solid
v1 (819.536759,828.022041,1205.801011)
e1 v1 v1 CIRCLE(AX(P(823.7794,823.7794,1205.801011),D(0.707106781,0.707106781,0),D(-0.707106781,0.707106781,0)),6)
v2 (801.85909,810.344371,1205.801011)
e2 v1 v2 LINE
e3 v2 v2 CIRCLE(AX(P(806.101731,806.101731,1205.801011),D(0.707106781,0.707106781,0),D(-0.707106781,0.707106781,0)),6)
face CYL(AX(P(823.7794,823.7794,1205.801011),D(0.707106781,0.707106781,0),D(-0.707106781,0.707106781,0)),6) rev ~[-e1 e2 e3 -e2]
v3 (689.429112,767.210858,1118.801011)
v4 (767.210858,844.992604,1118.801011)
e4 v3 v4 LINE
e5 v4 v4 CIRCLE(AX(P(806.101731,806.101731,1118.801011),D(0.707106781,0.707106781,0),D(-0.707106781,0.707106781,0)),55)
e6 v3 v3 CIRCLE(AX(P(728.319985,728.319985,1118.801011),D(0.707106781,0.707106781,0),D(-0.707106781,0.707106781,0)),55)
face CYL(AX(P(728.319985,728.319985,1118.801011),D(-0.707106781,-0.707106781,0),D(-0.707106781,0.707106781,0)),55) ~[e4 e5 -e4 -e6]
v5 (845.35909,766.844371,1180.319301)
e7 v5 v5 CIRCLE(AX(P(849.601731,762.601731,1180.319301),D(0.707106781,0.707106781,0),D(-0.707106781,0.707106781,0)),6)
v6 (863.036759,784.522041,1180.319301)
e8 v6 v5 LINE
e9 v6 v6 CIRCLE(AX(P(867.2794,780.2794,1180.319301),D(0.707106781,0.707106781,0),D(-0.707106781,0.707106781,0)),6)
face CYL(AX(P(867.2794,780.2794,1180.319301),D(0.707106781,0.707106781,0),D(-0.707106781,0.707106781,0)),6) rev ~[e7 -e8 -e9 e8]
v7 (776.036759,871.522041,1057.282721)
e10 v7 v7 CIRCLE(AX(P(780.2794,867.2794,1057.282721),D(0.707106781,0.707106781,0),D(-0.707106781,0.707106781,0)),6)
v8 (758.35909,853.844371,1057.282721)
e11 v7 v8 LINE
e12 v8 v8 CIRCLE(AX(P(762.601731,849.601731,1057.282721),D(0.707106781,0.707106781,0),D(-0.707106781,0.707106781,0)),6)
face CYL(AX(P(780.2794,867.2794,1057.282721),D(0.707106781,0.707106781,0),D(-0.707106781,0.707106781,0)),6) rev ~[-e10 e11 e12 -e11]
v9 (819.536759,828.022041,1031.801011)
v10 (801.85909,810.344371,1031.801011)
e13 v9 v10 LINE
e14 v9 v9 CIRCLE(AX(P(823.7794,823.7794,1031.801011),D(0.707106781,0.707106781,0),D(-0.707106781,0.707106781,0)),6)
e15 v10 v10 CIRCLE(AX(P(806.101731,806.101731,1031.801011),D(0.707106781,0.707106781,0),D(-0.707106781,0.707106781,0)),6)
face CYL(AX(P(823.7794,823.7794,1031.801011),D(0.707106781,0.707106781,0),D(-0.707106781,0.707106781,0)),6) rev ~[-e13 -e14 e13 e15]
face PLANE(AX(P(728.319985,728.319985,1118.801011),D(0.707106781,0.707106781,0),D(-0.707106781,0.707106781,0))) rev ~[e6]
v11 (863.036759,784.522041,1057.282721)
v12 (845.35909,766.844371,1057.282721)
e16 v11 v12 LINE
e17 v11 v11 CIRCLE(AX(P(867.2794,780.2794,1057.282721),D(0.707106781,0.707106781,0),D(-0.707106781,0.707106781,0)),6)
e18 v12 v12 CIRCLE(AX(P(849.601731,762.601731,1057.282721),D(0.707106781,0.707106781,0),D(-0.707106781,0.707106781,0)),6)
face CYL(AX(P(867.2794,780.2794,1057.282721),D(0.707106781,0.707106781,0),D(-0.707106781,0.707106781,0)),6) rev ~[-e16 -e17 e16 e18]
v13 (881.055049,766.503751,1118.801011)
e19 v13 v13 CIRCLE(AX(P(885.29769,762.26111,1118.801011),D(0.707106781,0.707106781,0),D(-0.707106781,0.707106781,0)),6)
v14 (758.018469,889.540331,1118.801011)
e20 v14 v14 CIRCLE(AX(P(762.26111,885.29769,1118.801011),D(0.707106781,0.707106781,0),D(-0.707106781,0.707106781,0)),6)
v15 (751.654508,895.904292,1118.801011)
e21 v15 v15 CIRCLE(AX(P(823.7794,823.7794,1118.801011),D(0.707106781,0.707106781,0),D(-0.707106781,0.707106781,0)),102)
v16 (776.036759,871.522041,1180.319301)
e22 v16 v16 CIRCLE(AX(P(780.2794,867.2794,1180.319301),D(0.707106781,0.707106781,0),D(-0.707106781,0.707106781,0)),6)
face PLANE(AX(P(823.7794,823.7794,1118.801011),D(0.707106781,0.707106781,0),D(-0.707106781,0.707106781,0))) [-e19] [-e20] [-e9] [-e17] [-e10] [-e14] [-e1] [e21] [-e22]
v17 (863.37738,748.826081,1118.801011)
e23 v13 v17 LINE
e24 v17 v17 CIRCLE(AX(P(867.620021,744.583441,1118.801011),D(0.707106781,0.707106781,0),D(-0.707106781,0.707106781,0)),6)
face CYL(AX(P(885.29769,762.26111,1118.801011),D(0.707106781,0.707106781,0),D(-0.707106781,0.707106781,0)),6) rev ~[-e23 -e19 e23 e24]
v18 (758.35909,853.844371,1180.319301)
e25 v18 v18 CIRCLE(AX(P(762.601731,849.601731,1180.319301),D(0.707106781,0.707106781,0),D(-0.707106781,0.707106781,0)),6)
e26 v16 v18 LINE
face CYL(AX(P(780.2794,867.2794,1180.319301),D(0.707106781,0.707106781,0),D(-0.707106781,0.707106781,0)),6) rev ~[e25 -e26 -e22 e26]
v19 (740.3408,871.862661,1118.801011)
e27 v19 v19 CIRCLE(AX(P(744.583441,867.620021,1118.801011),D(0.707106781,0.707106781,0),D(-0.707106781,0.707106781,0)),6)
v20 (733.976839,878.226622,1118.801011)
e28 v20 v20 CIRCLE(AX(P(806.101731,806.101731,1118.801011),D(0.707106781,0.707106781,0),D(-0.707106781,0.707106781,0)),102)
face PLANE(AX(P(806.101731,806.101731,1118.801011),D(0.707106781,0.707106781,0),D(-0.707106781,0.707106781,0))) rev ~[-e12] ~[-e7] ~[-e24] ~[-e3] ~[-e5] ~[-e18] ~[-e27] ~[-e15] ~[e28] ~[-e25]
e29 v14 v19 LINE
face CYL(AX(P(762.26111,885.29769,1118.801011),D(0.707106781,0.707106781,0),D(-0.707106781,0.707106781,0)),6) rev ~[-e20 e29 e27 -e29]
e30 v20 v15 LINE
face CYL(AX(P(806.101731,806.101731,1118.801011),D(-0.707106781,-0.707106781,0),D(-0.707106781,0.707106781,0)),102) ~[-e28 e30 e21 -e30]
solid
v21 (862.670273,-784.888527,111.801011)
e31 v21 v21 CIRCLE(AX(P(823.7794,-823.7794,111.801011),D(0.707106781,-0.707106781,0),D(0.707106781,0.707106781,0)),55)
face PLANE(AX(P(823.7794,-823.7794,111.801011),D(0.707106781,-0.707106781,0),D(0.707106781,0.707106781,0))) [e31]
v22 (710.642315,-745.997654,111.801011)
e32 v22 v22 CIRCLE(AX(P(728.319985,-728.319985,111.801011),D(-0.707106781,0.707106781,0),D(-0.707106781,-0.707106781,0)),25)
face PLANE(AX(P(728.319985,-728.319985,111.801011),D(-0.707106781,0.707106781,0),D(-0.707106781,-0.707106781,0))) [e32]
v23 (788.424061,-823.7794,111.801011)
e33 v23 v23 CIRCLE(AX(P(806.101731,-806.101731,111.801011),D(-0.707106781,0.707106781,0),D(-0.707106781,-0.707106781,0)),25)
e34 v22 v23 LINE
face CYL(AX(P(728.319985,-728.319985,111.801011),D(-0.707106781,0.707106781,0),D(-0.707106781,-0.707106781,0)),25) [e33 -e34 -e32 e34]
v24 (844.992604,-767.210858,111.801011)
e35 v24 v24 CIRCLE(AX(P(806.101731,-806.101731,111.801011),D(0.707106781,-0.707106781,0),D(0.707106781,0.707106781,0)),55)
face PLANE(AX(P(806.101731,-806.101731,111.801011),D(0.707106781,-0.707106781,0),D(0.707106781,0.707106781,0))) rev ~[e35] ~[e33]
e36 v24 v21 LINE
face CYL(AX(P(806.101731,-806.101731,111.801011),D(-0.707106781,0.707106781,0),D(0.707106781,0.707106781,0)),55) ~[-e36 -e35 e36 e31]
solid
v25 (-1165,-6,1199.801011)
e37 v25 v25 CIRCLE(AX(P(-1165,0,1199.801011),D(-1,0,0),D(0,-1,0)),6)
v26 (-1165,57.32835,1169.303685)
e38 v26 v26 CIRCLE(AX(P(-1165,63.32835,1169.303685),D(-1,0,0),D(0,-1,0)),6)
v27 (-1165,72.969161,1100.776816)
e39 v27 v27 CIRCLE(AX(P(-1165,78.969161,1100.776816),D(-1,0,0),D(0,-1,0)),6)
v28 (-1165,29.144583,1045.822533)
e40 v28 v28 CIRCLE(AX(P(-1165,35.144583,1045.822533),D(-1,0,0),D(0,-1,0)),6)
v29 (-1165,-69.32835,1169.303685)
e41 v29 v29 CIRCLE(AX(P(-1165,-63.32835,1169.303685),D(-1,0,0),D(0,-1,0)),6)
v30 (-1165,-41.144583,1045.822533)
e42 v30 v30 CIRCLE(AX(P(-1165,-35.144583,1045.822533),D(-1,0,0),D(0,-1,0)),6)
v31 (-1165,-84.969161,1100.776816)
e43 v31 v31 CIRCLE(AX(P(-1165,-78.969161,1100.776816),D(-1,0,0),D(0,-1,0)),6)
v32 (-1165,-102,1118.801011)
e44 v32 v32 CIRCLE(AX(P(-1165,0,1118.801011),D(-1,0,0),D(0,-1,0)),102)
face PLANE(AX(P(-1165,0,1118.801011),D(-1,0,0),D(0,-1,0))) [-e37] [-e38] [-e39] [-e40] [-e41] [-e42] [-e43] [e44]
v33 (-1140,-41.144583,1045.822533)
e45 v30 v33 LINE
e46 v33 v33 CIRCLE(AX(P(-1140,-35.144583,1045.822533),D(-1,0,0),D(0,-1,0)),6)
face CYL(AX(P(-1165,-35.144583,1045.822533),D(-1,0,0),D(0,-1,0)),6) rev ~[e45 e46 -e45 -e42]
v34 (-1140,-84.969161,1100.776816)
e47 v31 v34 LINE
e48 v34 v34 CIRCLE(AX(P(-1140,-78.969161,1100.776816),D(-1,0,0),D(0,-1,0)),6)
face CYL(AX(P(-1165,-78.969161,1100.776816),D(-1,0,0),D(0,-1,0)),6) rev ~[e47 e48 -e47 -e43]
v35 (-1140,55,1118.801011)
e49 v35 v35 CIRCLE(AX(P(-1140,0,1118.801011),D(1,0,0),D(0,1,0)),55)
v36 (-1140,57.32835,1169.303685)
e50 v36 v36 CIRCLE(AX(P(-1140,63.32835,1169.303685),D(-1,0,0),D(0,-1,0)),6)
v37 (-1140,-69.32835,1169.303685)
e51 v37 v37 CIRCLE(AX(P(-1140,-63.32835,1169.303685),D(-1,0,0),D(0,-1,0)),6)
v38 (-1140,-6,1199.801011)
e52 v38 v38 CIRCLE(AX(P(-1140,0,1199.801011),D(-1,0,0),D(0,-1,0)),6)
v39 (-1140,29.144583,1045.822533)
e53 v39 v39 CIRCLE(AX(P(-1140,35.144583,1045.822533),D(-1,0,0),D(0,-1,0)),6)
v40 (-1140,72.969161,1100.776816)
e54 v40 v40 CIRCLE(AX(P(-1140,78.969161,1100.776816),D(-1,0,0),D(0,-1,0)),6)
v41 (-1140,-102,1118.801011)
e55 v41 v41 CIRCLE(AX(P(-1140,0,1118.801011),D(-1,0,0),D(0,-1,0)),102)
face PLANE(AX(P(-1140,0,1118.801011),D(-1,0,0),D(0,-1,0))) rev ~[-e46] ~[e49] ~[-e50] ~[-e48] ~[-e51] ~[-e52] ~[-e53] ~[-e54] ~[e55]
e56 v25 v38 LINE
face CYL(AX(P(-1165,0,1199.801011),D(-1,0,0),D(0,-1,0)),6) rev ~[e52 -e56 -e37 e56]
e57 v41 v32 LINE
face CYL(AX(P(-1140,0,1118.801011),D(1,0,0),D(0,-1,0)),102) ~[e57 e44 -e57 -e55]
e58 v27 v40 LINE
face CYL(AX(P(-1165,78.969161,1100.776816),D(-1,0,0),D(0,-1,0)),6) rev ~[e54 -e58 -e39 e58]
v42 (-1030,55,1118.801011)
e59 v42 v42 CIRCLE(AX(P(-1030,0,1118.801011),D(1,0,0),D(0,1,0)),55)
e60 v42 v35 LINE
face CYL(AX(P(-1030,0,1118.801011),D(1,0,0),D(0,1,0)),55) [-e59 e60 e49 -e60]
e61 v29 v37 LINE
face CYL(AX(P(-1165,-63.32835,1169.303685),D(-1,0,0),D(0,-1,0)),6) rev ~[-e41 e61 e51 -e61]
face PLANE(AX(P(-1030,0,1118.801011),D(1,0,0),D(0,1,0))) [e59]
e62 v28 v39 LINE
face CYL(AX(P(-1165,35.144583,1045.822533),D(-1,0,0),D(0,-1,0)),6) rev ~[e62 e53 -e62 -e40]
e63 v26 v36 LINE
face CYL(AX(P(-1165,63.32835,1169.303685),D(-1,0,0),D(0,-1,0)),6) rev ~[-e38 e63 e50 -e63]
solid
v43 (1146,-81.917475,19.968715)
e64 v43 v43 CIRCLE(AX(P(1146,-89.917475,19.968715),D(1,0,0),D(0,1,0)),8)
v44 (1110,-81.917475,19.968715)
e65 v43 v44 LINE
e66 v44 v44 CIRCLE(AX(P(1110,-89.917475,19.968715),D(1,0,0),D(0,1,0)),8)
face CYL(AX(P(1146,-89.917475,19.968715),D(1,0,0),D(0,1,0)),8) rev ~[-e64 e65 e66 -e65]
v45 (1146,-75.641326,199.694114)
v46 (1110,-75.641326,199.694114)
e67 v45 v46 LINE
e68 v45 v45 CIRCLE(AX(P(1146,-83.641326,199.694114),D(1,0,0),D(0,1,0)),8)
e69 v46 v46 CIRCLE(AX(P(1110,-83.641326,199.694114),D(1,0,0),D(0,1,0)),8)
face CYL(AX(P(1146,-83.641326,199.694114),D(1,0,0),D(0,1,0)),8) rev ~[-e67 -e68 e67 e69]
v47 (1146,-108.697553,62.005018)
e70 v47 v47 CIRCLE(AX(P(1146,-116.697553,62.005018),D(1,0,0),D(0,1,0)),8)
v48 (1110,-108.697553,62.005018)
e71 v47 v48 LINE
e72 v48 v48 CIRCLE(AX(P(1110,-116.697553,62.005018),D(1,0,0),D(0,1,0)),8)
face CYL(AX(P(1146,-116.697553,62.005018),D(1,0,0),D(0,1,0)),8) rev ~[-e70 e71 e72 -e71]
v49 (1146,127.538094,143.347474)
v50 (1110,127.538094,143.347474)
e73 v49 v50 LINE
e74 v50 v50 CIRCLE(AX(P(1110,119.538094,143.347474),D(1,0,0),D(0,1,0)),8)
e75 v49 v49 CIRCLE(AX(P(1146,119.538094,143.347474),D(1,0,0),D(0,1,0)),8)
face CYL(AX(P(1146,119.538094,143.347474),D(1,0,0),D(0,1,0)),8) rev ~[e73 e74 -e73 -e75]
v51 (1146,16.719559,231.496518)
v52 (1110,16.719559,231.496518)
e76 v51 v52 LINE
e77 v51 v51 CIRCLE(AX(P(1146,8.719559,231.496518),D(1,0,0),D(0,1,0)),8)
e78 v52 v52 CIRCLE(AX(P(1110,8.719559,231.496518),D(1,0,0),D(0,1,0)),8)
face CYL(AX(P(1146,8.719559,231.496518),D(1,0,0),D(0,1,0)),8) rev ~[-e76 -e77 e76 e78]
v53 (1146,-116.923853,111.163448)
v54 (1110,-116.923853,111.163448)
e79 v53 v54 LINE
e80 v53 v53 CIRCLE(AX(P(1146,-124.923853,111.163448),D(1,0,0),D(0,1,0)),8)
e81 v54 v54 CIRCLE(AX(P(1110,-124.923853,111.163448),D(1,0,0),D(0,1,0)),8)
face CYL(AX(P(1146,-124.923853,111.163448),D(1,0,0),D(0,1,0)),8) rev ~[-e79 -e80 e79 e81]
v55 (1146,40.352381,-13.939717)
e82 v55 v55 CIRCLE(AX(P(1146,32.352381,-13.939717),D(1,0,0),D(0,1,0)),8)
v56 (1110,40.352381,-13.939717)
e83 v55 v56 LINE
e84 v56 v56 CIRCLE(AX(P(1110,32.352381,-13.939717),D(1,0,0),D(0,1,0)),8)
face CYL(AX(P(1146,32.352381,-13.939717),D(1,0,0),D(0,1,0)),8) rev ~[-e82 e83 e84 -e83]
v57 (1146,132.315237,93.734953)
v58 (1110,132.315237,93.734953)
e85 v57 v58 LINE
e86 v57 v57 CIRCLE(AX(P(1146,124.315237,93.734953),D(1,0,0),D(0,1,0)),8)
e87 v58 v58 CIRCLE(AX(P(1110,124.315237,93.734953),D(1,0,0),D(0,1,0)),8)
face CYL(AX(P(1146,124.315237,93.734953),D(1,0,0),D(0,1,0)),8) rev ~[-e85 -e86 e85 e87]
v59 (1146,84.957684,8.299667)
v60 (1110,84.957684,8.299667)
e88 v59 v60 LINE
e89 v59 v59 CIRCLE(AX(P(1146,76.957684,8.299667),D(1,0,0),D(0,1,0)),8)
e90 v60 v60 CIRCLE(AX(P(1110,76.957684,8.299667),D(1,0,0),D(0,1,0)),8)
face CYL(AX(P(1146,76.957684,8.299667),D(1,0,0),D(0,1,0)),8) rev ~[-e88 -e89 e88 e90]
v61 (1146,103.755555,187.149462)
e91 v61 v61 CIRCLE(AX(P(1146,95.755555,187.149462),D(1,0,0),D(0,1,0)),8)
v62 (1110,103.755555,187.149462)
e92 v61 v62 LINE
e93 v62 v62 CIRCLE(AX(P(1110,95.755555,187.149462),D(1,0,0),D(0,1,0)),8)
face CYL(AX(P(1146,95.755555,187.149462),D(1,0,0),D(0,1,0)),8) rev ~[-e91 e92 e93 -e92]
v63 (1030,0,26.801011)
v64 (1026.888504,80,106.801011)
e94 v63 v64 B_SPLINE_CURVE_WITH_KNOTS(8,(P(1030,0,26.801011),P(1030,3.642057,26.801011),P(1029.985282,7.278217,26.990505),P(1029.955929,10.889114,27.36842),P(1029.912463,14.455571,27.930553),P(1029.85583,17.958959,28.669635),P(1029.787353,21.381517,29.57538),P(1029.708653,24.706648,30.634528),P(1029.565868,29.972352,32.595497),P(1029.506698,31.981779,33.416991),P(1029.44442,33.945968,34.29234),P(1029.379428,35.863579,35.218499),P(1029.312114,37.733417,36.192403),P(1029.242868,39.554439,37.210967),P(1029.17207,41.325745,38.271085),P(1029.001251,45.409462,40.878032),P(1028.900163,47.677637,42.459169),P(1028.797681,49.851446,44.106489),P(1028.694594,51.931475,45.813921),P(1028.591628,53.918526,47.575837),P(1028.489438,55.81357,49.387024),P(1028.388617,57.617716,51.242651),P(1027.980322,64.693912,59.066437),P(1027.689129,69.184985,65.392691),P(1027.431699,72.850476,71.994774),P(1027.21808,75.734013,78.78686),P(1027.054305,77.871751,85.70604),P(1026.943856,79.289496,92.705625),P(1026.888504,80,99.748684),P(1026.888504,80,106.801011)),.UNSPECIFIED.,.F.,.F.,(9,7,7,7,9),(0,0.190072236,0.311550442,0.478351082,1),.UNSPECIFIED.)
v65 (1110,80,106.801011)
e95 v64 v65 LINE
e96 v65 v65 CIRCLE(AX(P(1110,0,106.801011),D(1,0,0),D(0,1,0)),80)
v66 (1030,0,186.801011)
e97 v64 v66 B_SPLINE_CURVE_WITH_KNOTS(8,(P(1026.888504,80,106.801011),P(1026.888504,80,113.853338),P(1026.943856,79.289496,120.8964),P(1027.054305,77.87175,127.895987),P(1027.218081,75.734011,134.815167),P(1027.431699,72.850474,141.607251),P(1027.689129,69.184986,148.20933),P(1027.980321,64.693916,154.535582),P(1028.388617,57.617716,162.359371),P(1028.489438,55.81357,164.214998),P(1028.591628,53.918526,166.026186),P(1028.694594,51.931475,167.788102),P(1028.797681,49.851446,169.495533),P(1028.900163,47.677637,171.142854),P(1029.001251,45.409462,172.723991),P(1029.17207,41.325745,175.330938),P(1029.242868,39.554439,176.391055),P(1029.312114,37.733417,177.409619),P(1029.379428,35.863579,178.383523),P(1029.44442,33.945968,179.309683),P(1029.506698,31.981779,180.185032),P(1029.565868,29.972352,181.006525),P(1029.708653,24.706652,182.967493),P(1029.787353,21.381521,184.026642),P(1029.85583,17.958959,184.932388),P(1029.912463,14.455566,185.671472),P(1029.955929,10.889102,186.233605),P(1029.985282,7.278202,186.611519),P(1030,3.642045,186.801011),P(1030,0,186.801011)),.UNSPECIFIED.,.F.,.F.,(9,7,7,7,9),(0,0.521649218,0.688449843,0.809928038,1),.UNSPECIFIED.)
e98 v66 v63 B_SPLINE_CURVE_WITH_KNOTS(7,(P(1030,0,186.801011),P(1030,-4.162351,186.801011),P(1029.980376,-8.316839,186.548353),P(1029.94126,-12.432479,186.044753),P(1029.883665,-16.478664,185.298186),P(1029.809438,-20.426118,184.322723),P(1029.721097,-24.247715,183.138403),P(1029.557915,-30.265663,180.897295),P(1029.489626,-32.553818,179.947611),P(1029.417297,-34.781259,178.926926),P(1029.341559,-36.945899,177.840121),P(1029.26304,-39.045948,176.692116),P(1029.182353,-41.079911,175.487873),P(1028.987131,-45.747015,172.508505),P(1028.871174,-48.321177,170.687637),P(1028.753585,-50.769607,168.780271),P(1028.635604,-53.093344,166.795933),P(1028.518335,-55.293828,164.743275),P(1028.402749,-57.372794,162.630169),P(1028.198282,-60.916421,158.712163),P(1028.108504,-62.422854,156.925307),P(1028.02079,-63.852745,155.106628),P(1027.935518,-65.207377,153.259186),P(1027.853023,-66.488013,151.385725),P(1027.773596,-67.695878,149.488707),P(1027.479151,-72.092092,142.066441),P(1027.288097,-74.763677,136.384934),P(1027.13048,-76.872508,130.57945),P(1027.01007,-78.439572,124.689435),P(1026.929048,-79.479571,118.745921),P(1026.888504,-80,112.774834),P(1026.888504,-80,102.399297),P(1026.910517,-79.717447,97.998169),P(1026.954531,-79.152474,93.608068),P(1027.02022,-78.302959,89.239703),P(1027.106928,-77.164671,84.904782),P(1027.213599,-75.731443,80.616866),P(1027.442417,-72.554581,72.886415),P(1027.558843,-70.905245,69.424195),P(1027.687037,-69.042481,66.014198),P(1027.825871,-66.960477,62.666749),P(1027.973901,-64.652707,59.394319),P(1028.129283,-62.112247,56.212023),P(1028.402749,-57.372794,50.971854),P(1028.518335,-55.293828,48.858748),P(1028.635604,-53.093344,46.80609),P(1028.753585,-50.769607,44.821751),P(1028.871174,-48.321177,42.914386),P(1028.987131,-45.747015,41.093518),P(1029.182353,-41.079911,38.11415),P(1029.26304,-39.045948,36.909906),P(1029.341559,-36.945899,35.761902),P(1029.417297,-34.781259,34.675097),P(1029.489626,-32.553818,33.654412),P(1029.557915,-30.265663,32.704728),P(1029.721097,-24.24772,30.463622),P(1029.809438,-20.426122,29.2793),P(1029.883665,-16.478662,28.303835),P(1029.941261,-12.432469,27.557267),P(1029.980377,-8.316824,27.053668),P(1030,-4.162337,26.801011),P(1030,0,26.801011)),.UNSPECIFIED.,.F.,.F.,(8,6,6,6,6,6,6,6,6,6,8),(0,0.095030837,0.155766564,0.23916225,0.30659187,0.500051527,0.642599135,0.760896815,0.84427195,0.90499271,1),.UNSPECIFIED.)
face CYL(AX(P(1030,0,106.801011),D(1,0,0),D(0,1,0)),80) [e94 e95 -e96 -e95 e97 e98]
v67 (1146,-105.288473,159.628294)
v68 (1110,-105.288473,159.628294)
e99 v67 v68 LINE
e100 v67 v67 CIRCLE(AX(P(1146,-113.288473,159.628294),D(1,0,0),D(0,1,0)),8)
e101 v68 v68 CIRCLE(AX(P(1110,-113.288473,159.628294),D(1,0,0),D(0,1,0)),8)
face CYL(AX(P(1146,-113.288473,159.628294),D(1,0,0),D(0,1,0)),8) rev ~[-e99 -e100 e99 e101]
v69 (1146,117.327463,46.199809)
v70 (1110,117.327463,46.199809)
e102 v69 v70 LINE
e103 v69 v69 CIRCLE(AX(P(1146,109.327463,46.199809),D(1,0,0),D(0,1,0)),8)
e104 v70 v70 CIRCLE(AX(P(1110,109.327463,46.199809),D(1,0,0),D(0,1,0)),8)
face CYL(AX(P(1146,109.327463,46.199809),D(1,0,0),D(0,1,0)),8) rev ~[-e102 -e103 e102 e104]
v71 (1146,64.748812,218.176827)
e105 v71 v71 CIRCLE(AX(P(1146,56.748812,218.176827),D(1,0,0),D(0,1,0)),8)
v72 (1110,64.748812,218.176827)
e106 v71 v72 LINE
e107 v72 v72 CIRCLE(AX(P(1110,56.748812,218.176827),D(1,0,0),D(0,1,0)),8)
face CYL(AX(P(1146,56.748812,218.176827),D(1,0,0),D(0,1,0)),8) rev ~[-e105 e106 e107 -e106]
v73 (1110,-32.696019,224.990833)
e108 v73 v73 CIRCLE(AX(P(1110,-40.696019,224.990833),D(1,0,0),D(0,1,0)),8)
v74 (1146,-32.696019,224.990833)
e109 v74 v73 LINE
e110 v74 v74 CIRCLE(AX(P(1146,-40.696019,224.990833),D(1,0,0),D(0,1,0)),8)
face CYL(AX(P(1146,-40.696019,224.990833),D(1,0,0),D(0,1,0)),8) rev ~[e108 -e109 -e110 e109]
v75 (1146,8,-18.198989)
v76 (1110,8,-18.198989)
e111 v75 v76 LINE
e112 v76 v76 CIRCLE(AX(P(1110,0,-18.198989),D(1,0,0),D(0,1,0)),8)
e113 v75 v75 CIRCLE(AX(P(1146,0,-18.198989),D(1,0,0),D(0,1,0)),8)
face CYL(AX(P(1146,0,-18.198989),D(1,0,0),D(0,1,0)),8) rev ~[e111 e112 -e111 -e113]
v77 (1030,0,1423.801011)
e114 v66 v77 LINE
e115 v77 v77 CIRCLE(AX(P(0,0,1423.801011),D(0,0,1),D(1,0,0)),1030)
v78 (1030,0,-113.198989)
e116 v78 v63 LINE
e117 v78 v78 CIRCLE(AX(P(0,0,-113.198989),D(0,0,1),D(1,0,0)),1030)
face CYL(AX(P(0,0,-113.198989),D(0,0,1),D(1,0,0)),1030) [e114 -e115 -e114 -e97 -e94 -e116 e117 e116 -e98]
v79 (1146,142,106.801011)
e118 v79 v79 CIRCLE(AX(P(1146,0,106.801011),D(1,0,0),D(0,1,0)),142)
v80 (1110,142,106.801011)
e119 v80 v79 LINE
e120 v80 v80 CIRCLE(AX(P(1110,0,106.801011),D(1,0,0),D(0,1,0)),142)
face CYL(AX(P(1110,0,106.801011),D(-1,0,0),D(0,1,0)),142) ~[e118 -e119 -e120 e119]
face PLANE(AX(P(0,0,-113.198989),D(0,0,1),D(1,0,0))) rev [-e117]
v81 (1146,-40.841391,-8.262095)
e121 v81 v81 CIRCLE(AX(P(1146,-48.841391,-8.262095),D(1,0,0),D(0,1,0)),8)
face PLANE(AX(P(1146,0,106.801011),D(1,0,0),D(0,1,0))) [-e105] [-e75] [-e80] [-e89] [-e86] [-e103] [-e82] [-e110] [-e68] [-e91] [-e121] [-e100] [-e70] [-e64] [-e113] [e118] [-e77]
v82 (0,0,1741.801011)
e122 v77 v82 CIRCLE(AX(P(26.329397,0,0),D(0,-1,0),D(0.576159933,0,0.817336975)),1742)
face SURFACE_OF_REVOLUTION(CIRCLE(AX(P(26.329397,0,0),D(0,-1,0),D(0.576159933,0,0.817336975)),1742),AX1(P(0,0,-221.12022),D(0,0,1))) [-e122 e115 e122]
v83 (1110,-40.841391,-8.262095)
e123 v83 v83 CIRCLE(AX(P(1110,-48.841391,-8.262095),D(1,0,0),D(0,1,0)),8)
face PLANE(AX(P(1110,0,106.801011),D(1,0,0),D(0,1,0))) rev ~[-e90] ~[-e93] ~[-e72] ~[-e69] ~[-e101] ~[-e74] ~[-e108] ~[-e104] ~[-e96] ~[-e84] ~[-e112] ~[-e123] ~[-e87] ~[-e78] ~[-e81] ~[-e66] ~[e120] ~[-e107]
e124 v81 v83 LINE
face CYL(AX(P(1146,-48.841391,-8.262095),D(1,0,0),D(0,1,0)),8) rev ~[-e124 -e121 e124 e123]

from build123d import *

# Parameters (mm, degrees)
F3_R      = 80
F4_DEPTH  = 80
F5_R      = 142
F6_DEPTH  = 36
F7_R      = 8
F8_DEPTH  = 75
F10_R     = 55
F11_DEPTH = 110
F12_R     = 102
F13_DEPTH = 25
F14_R     = 6
F15_DEPTH = 75
F18_R     = 55
F19_DEPTH = 110
F20_R     = 102
F21_DEPTH = 25
F22_R     = 6
F23_DEPTH = 75
F26_R     = 25
F27_DEPTH = 110
F28_R     = 55
F29_DEPTH = 25


with BuildPart() as f1:
    # F0 (on Front) → F1 (revolve)
    with BuildSketch(Plane.XZ):
        with BuildLine():
            Line((0, 1741.8010112751), (0, -113.1989887249))
            Line((0, -113.1989887249), (1030, -113.1989887249))
            Line((1030, -113.1989887249), (1030, 1423.8010112751))
            ThreePointArc((1030, 1423.8010112751), (540.2165034856, 1664.4771074705), (0, 1741.8010112751))
        make_face()
    revolve(axis=Axis((0, 0, -221.1202199703), (0, 0, 1)))

    # F3 (on offset) → F4 (join, symmetric)
    with BuildSketch(Plane.YZ.offset(1030)):
        with Locations((0, 106.8010112751)):
            Circle(F3_R)
    extrude(amount=F4_DEPTH, both=True)

    # F5 (on face) → F6 (join)
    with BuildSketch(Plane.YZ.offset(1110)):
        with Locations((0, 106.8010112751)):
            Circle(F5_R)
    extrude(amount=F6_DEPTH)

    # F7 (on face) → F8 (cut)
    with BuildSketch(Plane.YZ.offset(1146)):
        with Locations((0, -18.1989887249)):
            Circle(F7_R)
        with Locations((-48.8413910612, -8.2620954065)):
            Circle(F7_R)
        with Locations((-89.9174750423, 19.9687149677)):
            Circle(F7_R)
        with Locations((-116.6975533122, 62.0050175819)):
            Circle(F7_R)
        with Locations((-124.9238533774, 111.1634483629)):
            Circle(F7_R)
        with Locations((-113.2884733796, 159.6282939927)):
            Circle(F7_R)
        with Locations((-83.6413257949, 199.6941144598)):
            Circle(F7_R)
        with Locations((-40.6960193071, 224.990833225)):
            Circle(F7_R)
        with Locations((8.719559218, 231.4965175576)):
            Circle(F7_R)
        with Locations((56.7488124674, 218.1768267986)):
            Circle(F7_R)
        with Locations((95.7555553899, 187.1494624859)):
            Circle(F7_R)
        with Locations((119.5380944954, 143.3474743654)):
            Circle(F7_R)
        with Locations((124.315236921, 93.7349533666)):
            Circle(F7_R)
        with Locations((109.3274633924, 46.1998087443)):
            Circle(F7_R)
        with Locations((76.9576844157, 8.2996670743)):
            Circle(F7_R)
        with Locations((32.3523806378, -13.939717011)):
            Circle(F7_R)
    extrude(amount=-F8_DEPTH, mode=Mode.SUBTRACT)


with BuildPart() as f11:
    # F10 (on offset) → F11 (new body)
    with BuildSketch(Plane.YZ.offset(-1030)):
        with Locations((0, 1118.8010112751)):
            Circle(F10_R)
    extrude(amount=-F11_DEPTH)

    # F12 (on face) → F13 (join)
    with BuildSketch(Plane(origin=(-1140, 0, 0), x_dir=(0, -1, 0), z_dir=(-1, 0, 0))):
        with Locations((0, 1118.8010112751)):
            Circle(F12_R)
    extrude(amount=F13_DEPTH)

    # F14 (on face) → F15 (cut)
    with BuildSketch(Plane(origin=(-1165, 0, 0), x_dir=(0, -1, 0), z_dir=(-1, 0, 0))):
        with Locations((0, 1199.8010112751)):
            Circle(F14_R)
        with Locations((-1039.0581552505, -599.9005056375)):
            Circle(F14_R)
        with Locations((1039.0581552505, -599.9005056376)):
            Circle(F14_R)
        with Locations((63.3283500799, 1169.3036852257)):
            Circle(F14_R)
        with Locations((78.9691608867, 1100.7768156246)):
            Circle(F14_R)
        with Locations((35.1445828685, 1045.822532975)):
            Circle(F14_R)
        with Locations((-35.1445828685, 1045.822532975)):
            Circle(F14_R)
        with Locations((-78.9691608867, 1100.7768156246)):
            Circle(F14_R)
        with Locations((-63.3283500799, 1169.3036852257)):
            Circle(F14_R)
    extrude(amount=-F15_DEPTH, mode=Mode.SUBTRACT)


with BuildPart() as f19:
    # F18 (on face) → F19 (new body)
    with BuildSketch(Plane(origin=(728.3199846221, 728.3199846221, 0), x_dir=(-0.7071067812, 0.7071067812, 0), z_dir=(0.7071067812, 0.7071067812, 0))):
        with Locations((0, 1118.8010112751)):
            Circle(F18_R)
    extrude(amount=F19_DEPTH)

    # F20 (on face) → F21 (join)
    with BuildSketch(Plane(origin=(806.1017305527, 806.1017305527, 0), x_dir=(-0.7071067812, 0.7071067812, 0), z_dir=(0.7071067812, 0.7071067812, 0))):
        with Locations((0, 1118.8010112751)):
            Circle(F20_R)
    extrude(amount=F21_DEPTH)

    # F22 (on face) → F23 (cut)
    with BuildSketch(Plane(origin=(823.7794000823, 823.7794000823, 0), x_dir=(-0.7071067812, 0.7071067812, 0), z_dir=(0.7071067812, 0.7071067812, 0))):
        with Locations((0, 1205.8010112751)):
            Circle(F22_R)
        with Locations((-61.5182899632, 1180.3193012383)):
            Circle(F22_R)
        with Locations((-87, 1118.8010112751)):
            Circle(F22_R)
        with Locations((-61.5182899632, 1057.2827213119)):
            Circle(F22_R)
        with Locations((0, 1031.8010112751)):
            Circle(F22_R)
        with Locations((61.5182899632, 1057.2827213119)):
            Circle(F22_R)
        with Locations((87, 1118.8010112751)):
            Circle(F22_R)
        with Locations((61.5182899632, 1180.3193012383)):
            Circle(F22_R)
    extrude(amount=-F23_DEPTH, mode=Mode.SUBTRACT)


with BuildPart() as f27:
    # F26 (on face) → F27 (new body)
    with BuildSketch(Plane(origin=(728.3199846221, -728.3199846221, 0), x_dir=(-0.7071067812, -0.7071067812, 0), z_dir=(-0.7071067812, 0.7071067812, 0))):
        with Locations((0, 111.8010112751)):
            Circle(F26_R)
    extrude(amount=-F27_DEPTH)

    # F28 (on face) → F29 (join)
    with BuildSketch(Plane(origin=(806.1017305527, -806.1017305527, 0), x_dir=(0.7071067812, 0.7071067812, 0), z_dir=(0.7071067812, -0.7071067812, 0))):
        with Locations((0, 111.8010112751)):
            Circle(F28_R)
    extrude(amount=F29_DEPTH)


solid = Compound([f1.part, f11.part, f19.part, f27.part])
